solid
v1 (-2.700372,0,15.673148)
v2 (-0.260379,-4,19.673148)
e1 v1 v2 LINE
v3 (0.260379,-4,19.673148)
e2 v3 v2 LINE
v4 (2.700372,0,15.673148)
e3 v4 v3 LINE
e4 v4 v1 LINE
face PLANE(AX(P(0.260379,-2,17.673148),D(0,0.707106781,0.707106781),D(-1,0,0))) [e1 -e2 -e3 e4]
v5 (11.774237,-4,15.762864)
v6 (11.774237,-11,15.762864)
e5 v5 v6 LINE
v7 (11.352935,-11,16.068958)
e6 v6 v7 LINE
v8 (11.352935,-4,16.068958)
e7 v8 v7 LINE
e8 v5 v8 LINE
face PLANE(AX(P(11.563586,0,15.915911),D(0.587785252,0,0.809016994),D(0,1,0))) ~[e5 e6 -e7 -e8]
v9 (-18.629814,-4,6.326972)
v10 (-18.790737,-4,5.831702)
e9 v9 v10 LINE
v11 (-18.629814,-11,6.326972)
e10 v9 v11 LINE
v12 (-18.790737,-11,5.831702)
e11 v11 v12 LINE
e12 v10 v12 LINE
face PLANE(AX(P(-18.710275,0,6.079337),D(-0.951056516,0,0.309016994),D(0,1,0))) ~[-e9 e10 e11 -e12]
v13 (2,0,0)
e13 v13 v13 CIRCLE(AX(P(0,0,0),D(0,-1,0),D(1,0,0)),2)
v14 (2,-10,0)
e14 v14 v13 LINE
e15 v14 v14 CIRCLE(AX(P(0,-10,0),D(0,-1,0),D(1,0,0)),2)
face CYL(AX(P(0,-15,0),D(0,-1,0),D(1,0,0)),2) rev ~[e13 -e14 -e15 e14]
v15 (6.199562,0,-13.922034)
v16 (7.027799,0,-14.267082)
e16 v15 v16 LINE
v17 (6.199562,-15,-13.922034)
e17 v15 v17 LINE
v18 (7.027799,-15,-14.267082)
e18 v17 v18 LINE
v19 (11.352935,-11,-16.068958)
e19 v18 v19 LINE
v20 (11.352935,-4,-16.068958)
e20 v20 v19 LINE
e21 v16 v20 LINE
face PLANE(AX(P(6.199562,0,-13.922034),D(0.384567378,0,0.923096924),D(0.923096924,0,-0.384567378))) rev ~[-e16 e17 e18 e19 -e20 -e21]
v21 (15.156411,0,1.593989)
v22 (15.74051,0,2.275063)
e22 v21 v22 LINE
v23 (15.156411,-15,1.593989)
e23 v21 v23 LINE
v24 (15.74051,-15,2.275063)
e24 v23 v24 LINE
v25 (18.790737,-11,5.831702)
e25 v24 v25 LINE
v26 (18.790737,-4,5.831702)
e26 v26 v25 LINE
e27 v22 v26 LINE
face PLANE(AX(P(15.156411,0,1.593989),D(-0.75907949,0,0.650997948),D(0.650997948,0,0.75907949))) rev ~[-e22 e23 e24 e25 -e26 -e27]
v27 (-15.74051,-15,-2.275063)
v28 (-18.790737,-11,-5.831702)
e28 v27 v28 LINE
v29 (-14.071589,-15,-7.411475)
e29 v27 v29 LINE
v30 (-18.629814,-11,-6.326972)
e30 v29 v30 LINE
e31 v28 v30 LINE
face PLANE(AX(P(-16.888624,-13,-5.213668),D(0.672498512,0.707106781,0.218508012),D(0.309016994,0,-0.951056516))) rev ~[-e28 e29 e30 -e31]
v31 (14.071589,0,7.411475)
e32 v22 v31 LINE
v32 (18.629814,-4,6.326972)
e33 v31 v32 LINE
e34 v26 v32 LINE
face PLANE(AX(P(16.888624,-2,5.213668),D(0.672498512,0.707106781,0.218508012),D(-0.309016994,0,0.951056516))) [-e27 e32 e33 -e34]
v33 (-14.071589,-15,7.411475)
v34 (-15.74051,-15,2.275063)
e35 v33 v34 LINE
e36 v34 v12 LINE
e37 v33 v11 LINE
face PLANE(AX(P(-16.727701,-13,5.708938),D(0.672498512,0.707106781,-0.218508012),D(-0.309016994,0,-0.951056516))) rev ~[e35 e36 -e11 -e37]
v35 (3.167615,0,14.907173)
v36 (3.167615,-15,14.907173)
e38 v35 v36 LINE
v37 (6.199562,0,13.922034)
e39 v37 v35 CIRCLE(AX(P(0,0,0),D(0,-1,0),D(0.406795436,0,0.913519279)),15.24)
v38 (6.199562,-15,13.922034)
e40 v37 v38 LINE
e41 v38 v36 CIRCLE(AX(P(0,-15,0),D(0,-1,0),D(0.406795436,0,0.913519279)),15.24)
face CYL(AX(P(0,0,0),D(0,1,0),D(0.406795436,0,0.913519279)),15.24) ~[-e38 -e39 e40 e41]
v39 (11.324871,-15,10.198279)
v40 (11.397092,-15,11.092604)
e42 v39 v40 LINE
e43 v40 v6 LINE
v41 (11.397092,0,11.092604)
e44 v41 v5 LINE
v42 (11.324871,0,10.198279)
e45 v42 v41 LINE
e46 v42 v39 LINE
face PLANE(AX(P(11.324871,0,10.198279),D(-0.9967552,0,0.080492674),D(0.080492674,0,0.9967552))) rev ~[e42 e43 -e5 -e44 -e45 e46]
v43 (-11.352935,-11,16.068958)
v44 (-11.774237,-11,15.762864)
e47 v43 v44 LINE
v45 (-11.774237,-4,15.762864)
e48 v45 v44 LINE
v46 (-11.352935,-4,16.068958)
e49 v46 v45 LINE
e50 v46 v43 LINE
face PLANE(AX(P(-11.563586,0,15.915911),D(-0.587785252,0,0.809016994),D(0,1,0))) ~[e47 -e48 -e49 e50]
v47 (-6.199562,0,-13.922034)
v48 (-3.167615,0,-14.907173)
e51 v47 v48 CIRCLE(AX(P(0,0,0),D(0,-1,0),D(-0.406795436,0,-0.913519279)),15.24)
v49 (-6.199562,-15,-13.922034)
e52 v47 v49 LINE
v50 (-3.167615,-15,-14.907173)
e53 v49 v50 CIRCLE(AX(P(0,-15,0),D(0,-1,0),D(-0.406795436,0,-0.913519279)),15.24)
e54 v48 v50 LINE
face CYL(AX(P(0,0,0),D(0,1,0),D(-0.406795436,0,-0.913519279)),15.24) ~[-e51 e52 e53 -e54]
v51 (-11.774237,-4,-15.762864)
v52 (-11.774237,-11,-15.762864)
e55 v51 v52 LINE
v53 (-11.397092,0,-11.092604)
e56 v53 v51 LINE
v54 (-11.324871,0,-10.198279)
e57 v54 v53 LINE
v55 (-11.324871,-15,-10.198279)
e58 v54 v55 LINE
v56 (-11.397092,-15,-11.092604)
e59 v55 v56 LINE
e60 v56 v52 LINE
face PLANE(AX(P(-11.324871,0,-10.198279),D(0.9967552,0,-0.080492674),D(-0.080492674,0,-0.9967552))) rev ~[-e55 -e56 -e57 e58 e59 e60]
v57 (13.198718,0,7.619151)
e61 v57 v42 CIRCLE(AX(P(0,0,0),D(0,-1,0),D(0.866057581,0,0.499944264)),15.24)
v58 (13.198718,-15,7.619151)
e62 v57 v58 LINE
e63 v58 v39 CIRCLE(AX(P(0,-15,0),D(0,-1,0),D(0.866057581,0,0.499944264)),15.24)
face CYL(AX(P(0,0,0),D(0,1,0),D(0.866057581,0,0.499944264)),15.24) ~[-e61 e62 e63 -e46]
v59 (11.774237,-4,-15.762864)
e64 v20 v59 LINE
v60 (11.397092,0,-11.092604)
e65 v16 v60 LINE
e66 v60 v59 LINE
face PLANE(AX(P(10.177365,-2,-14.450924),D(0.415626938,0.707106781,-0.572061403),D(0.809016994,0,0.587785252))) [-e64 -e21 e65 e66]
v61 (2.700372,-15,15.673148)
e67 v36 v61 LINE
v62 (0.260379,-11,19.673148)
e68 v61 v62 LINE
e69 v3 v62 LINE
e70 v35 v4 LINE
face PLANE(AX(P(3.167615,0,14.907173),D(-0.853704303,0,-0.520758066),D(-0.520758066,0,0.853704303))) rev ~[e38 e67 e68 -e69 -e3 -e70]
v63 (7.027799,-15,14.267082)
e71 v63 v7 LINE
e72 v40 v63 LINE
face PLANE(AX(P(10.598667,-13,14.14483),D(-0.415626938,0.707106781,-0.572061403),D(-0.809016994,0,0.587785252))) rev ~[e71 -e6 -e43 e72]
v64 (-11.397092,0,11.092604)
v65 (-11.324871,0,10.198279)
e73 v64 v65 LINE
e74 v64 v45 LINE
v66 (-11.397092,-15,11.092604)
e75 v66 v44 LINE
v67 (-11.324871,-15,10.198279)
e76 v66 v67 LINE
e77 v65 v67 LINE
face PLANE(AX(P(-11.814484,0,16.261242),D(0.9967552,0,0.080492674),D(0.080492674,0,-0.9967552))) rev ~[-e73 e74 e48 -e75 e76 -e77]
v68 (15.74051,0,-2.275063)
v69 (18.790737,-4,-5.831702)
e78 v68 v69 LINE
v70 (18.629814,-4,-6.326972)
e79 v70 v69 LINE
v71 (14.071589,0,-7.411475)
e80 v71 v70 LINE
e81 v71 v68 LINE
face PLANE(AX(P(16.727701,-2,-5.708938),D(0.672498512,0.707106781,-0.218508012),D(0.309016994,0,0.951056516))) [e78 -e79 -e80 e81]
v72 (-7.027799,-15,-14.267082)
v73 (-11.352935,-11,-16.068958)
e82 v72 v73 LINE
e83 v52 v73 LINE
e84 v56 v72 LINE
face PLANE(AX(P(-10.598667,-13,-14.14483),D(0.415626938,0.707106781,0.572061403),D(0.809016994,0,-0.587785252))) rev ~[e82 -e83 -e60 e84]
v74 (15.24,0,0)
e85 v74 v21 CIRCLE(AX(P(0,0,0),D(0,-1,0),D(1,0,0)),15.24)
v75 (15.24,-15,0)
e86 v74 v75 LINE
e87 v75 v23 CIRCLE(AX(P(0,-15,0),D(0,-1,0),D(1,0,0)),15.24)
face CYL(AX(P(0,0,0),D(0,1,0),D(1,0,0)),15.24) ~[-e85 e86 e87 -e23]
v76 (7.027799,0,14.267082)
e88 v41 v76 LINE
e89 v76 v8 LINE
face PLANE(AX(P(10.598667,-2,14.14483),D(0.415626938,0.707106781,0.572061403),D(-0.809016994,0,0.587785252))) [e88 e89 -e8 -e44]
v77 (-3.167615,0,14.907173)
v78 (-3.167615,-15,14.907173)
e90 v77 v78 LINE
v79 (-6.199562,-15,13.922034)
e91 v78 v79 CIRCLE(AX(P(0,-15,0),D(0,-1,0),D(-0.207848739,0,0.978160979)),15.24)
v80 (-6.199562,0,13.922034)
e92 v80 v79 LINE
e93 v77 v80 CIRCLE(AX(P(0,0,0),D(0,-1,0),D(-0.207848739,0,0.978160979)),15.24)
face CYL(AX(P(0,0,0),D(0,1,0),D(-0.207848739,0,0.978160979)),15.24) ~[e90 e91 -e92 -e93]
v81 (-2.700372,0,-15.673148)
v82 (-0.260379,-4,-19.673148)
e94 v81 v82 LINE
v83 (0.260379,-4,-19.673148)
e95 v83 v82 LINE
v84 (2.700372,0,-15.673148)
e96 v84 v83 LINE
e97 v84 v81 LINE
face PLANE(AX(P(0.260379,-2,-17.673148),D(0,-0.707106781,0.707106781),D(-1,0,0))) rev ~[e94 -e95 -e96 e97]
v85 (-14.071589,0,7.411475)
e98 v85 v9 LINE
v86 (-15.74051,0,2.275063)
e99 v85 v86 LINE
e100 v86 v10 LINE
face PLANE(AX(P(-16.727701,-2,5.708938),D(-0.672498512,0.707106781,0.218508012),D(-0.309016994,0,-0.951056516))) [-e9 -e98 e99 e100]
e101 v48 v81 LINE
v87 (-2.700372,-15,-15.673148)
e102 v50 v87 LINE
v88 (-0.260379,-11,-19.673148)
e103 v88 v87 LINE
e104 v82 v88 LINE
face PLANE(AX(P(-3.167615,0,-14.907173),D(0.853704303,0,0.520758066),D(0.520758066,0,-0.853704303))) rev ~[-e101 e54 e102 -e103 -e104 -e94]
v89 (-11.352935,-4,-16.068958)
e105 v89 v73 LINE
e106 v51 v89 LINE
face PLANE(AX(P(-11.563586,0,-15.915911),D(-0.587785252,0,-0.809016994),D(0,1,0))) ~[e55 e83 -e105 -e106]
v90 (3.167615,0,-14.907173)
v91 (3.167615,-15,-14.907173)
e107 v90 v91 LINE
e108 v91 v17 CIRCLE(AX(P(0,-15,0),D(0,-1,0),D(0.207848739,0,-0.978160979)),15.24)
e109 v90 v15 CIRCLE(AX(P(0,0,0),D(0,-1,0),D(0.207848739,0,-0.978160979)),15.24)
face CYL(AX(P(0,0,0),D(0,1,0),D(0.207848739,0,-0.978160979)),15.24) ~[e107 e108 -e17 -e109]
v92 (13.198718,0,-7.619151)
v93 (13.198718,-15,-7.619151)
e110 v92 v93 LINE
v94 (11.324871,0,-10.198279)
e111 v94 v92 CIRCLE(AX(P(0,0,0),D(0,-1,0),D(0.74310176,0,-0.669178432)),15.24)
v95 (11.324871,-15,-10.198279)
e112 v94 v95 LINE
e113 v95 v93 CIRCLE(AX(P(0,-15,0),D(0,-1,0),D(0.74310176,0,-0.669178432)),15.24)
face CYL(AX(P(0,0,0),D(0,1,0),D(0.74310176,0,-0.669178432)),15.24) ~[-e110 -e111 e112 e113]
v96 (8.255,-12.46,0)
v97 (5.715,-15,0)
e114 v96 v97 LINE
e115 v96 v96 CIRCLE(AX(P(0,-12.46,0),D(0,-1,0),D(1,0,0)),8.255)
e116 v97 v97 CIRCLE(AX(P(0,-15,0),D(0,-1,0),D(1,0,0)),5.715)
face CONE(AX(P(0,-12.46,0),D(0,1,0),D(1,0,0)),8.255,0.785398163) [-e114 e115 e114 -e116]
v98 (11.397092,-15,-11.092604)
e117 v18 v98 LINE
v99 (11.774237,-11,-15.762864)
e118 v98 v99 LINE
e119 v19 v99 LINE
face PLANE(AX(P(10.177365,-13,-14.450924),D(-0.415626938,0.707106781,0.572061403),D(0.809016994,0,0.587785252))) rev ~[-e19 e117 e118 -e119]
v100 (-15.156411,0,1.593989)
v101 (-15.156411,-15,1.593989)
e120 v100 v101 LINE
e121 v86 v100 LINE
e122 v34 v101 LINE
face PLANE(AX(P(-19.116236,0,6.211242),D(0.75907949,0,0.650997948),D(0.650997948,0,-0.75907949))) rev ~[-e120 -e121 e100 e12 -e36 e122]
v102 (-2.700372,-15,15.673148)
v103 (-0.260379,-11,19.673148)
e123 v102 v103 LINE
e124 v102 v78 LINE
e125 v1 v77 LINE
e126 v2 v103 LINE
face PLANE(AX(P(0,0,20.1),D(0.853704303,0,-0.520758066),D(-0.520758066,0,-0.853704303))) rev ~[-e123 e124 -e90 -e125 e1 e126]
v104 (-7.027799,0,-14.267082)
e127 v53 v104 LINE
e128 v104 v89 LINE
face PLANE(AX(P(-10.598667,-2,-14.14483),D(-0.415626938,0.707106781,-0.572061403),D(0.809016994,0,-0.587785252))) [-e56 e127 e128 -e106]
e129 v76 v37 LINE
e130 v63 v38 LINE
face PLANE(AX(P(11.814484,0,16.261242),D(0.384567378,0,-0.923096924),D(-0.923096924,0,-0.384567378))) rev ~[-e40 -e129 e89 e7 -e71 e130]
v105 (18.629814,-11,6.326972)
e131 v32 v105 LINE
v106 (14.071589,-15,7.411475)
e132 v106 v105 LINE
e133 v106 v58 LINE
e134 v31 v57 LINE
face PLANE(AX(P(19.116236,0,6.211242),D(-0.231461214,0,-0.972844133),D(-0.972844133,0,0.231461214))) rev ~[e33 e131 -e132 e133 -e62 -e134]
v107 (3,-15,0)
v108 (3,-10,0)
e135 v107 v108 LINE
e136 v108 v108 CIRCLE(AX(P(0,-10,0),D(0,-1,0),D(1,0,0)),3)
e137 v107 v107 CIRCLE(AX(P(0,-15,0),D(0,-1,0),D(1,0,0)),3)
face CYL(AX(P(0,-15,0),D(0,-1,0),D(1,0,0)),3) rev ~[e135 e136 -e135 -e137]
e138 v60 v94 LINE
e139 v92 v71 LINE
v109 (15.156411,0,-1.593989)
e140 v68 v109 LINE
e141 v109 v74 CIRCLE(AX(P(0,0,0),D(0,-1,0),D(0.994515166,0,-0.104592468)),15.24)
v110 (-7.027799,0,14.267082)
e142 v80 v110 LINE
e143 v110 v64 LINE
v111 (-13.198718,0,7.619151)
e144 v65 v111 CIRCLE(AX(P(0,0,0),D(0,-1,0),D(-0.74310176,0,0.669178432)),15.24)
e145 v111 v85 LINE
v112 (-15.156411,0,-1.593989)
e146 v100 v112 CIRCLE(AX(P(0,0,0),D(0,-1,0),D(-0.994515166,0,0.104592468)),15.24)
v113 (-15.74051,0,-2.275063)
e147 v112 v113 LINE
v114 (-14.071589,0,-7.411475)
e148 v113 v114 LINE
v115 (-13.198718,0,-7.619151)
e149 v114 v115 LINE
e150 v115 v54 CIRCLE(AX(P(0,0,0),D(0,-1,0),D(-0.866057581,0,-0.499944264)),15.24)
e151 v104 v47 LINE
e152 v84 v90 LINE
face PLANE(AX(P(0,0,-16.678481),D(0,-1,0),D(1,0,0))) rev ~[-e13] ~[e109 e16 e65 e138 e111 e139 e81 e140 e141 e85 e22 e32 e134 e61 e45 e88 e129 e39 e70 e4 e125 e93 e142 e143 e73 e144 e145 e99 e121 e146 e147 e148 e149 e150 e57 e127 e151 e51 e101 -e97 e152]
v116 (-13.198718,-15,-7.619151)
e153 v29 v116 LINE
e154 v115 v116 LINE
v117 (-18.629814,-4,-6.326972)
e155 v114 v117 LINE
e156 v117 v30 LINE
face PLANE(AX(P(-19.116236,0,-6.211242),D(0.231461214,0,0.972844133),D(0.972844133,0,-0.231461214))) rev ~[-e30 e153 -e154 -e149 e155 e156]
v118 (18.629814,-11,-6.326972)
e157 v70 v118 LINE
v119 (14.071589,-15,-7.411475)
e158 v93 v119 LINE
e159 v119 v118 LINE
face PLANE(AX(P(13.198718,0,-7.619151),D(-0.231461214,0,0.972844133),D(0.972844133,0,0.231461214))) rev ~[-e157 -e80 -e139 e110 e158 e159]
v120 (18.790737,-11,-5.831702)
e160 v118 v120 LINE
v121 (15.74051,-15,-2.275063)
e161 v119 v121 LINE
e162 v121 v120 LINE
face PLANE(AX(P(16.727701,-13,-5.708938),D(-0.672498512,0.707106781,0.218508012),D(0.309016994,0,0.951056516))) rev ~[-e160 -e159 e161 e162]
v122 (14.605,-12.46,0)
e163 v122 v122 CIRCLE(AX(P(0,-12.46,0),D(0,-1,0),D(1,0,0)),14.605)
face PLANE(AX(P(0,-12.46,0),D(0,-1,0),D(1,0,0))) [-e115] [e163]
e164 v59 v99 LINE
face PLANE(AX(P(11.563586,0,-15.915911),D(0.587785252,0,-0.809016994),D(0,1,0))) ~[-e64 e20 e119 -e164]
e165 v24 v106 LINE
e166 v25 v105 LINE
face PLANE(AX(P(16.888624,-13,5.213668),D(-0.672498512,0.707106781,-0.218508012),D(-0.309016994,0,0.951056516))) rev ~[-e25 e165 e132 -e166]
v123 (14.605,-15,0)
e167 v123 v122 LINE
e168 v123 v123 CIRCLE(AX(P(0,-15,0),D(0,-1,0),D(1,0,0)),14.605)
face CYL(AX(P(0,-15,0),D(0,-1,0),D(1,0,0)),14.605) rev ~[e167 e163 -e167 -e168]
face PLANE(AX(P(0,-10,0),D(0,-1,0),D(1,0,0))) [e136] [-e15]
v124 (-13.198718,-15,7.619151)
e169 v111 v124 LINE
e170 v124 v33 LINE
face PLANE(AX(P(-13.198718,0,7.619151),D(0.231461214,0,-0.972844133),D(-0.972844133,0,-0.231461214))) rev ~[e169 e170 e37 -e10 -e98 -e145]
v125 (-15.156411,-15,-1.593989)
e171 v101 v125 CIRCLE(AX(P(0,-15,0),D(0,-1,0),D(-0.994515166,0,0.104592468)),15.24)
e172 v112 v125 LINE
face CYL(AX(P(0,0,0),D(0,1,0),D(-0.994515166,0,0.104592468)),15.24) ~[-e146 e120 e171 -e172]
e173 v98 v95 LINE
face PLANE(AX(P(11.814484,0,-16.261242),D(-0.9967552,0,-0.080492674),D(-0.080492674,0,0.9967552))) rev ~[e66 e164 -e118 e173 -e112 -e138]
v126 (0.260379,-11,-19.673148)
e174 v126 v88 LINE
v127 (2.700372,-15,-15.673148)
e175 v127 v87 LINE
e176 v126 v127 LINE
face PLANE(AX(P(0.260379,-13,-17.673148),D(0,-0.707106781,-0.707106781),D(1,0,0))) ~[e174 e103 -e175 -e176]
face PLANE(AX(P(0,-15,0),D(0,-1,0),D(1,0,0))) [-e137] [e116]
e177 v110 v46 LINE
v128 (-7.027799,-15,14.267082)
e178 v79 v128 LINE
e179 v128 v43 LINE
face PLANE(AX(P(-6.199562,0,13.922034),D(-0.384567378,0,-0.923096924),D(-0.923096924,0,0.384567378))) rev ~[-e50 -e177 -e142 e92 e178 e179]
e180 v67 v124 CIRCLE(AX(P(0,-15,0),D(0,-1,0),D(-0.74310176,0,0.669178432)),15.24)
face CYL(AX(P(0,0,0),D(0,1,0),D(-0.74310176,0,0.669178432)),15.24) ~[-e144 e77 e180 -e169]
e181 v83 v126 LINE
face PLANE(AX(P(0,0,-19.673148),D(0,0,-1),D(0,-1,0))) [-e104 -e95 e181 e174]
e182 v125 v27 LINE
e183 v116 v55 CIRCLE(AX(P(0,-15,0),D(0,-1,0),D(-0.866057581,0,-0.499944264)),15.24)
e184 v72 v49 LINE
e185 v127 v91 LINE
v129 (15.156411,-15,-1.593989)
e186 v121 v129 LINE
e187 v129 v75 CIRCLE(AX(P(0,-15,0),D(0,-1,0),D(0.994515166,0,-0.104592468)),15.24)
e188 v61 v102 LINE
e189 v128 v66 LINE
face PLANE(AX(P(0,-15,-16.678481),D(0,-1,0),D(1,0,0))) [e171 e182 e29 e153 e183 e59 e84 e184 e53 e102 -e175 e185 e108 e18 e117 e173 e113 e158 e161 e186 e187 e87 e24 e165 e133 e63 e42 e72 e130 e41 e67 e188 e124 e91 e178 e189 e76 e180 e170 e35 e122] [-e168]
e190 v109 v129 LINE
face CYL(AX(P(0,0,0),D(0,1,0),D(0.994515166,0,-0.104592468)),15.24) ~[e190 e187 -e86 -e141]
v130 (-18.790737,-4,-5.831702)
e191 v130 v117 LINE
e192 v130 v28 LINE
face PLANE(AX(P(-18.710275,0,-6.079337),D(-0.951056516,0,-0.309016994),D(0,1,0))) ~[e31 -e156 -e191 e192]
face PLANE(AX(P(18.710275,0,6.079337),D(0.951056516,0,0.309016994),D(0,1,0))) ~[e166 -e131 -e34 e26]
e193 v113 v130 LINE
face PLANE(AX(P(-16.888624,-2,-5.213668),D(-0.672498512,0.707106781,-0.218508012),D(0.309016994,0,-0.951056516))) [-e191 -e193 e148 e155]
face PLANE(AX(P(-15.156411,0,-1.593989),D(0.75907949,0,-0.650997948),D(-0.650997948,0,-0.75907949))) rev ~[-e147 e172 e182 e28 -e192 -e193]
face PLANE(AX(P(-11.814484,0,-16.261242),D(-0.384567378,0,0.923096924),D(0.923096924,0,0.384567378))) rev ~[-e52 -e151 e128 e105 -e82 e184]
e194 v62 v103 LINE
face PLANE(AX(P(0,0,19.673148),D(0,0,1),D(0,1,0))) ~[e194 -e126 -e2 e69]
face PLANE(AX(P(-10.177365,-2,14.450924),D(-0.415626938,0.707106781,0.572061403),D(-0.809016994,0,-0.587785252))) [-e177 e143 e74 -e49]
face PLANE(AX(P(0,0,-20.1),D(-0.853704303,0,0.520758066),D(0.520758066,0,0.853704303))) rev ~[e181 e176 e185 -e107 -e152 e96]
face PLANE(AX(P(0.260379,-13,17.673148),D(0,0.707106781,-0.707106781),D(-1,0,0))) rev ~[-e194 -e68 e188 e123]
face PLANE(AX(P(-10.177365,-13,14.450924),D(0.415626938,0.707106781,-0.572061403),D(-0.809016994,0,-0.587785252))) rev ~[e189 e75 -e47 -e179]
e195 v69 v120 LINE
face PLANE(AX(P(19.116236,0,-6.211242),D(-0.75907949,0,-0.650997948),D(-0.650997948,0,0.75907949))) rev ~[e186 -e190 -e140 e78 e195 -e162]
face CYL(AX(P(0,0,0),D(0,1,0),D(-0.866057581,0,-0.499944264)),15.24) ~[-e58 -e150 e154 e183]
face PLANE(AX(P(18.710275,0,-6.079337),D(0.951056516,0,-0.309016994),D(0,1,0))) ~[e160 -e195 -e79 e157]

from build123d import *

# Parameters (mm, degrees)
F1_DEPTH = 15
F2_SIZE  = 0.5
F3_SIZE  = 4
F4_R     = 2
F5_DEPTH = 25.4
F6_R     = 3
F7_DEPTH = 5
F8_R     = 14.605
F8_R_2   = 3.175
F9_DEPTH = 2.54


# Not quite as in the source:
# - a fillet or chamfer that OpenCascade refuses, or shapes differently, is made with other operations: its cross-section is extruded or revolved along the edge and cut away or added


with BuildPart() as f1:
    # F0 (on Front) → F1 (new body)
    with BuildSketch(Plane.XZ):
        with BuildLine():
            Line((0, -20.1), (3.1676147888, -14.9071733253))
            ThreePointArc((3.1676147888, -14.9071733253), (0, -15.24), (-3.1676147888, -14.9071733253))
            Line((-3.1676147888, -14.9071733253), (0, -20.1))
        make_face()
        with BuildLine():
            ThreePointArc((-3.1676147888, 14.9071733253), (0, 15.24), (3.1676147888, 14.9071733253))
            Line((3.1676147888, 14.9071733253), (0, 20.1))
            Line((0, 20.1), (-3.1676147888, 14.9071733253))
        make_face()
        with BuildLine():
            ThreePointArc((-11.3248708297, 10.1982793004), (-8.9578472449, 12.3294189943), (-6.1995624382, 13.922033816))
            Line((-6.1995624382, 13.922033816), (-11.8144835711, 16.2612415869))
            Line((-11.8144835711, 16.2612415869), (-11.3248708297, 10.1982793004))
        make_face()
        with BuildLine():
            ThreePointArc((-15.1564111319, 1.5939892096), (-14.4941013083, 4.7094189943), (-13.1987175292, 7.6191505816))
            Line((-13.1987175292, 7.6191505816), (-19.1162359775, 6.2112415869))
            Line((-19.1162359775, 6.2112415869), (-15.1564111319, 1.5939892096))
        make_face()
        with BuildLine():
            Line((-19.1162359775, -6.2112415869), (-13.1987175292, -7.6191505816))
            ThreePointArc((-13.1987175292, -7.6191505816), (-14.4941013083, -4.7094189943), (-15.1564111319, -1.5939892096))
            Line((-15.1564111319, -1.5939892096), (-19.1162359775, -6.2112415869))
        make_face()
        with BuildLine():
            Line((-11.8144835711, -16.2612415869), (-6.1995624382, -13.922033816))
            ThreePointArc((-6.1995624382, -13.922033816), (-8.9578472449, -12.3294189943), (-11.3248708297, -10.1982793004))
            Line((-11.3248708297, -10.1982793004), (-11.8144835711, -16.2612415869))
        make_face()
        with BuildLine():
            ThreePointArc((15.1564111319, -1.5939892096), (15.2190884361, -0.7980897035), (15.24, 0))
            ThreePointArc((15.24, 0), (15.2190884361, 0.7980897035), (15.1564111319, 1.5939892096))
            ThreePointArc((15.1564111319, 1.5939892096), (14.4941013083, 4.7094189943), (13.1987175292, 7.6191505816))
            ThreePointArc((13.1987175292, 7.6191505816), (12.3294189943, 8.9578472449), (11.3248708297, 10.1982793004))
            ThreePointArc((11.3248708297, 10.1982793004), (8.9578472449, 12.3294189943), (6.1995624382, 13.922033816))
            ThreePointArc((6.1995624382, 13.922033816), (4.7094189943, 14.4941013083), (3.1676147888, 14.9071733253))
            ThreePointArc((3.1676147888, 14.9071733253), (0, 15.24), (-3.1676147888, 14.9071733253))
            ThreePointArc((-3.1676147888, 14.9071733253), (-4.7094189943, 14.4941013083), (-6.1995624382, 13.922033816))
            ThreePointArc((-6.1995624382, 13.922033816), (-8.9578472449, 12.3294189943), (-11.3248708297, 10.1982793004))
            ThreePointArc((-11.3248708297, 10.1982793004), (-12.3294189943, 8.9578472449), (-13.1987175292, 7.6191505816))
            ThreePointArc((-13.1987175292, 7.6191505816), (-14.4941013083, 4.7094189943), (-15.1564111319, 1.5939892096))
            ThreePointArc((-15.1564111319, 1.5939892096), (-15.24, 0), (-15.1564111319, -1.5939892096))
            ThreePointArc((-15.1564111319, -1.5939892096), (-14.4941013083, -4.7094189943), (-13.1987175292, -7.6191505816))
            ThreePointArc((-13.1987175292, -7.6191505816), (-12.3294189943, -8.9578472449), (-11.3248708297, -10.1982793004))
            ThreePointArc((-11.3248708297, -10.1982793004), (-8.9578472449, -12.3294189943), (-6.1995624382, -13.922033816))
            ThreePointArc((-6.1995624382, -13.922033816), (-4.7094189943, -14.4941013083), (-3.1676147888, -14.9071733253))
            ThreePointArc((-3.1676147888, -14.9071733253), (0, -15.24), (3.1676147888, -14.9071733253))
            ThreePointArc((3.1676147888, -14.9071733253), (4.7094189943, -14.4941013083), (6.1995624382, -13.922033816))
            ThreePointArc((6.1995624382, -13.922033816), (8.9578472449, -12.3294189943), (11.3248708297, -10.1982793004))
            ThreePointArc((11.3248708297, -10.1982793004), (12.3294189943, -8.9578472449), (13.1987175292, -7.6191505816))
            ThreePointArc((13.1987175292, -7.6191505816), (14.4941013083, -4.7094189943), (15.1564111319, -1.5939892096))
        make_face()
        with BuildLine():
            ThreePointArc((6.1995624382, 13.922033816), (8.9578472449, 12.3294189943), (11.3248708297, 10.1982793004))
            Line((11.3248708297, 10.1982793004), (11.8144835711, 16.2612415869))
            Line((11.8144835711, 16.2612415869), (6.1995624382, 13.922033816))
        make_face()
        with BuildLine():
            ThreePointArc((13.1987175292, 7.6191505816), (14.4941013083, 4.7094189943), (15.1564111319, 1.5939892096))
            Line((15.1564111319, 1.5939892096), (19.1162359775, 6.2112415869))
            Line((19.1162359775, 6.2112415869), (13.1987175292, 7.6191505816))
        make_face()
        with BuildLine():
            Line((19.1162359775, -6.2112415869), (15.1564111319, -1.5939892096))
            ThreePointArc((15.1564111319, -1.5939892096), (14.4941013083, -4.7094189943), (13.1987175292, -7.6191505816))
            Line((13.1987175292, -7.6191505816), (19.1162359775, -6.2112415869))
        make_face()
        with BuildLine():
            Line((11.8144835711, -16.2612415869), (11.3248708297, -10.1982793004))
            ThreePointArc((11.3248708297, -10.1982793004), (8.9578472449, -12.3294189943), (6.1995624382, -13.922033816))
            Line((6.1995624382, -13.922033816), (11.8144835711, -16.2612415869))
        make_face()
    extrude(amount=F1_DEPTH)

    # F2
    f2_edges = [f1.edges().sort_by_distance(p)[0] for p in [
        (0, -7.5, -20.1),
        (0, -7.5, 20.1),
        (-11.814484, -7.5, -16.261242),
        (-19.116236, -7.5, -6.211242),
        (-19.116236, -7.5, 6.211242),
        (-11.814484, -7.5, 16.261242),
        (11.814484, -7.5, 16.261242),
        (19.116236, -7.5, 6.211242),
        (19.116236, -7.5, -6.211242),
        (11.814484, -7.5, -16.261242),
    ]]
    chamfer(f2_edges, length=F2_SIZE)

    # F3
    f3_edges = [f1.edges().sort_by_distance(p)[0] for p in [
        (-11.563586, -15, 15.915911),
        (-11.563586, 0, 15.915911),
        (0, 0, 19.673148),
        (0, -15, 19.673148),
        (0, -15, -19.673148),
        (-11.563586, -15, -15.915911),
        (-18.710275, -15, -6.079337),
        (-18.710275, -15, 6.079337),
        (-18.710275, 0, 6.079337),
        (-18.710275, 0, -6.079337),
        (-11.563586, 0, -15.915911),
        (0, 0, -19.673148),
        (11.563586, -15, 15.915911),
        (18.710275, -15, 6.079337),
        (18.710275, -15, -6.079337),
        (11.563586, -15, -15.915911),
        (11.563586, 0, 15.915911),
        (18.710275, 0, 6.079337),
        (18.710275, 0, -6.079337),
        (11.563586, 0, -15.915911),
    ]]
    chamfer(f3_edges, length=F3_SIZE)

    # F4 (on face) → F5 (cut)
    with BuildSketch(Plane.XZ.offset(15)):
        Circle(F4_R)
    extrude(amount=-F5_DEPTH, mode=Mode.SUBTRACT)

    # F6 (on face) → F7 (cut)
    with BuildSketch(Plane.XZ.offset(15)):
        Circle(F6_R)
    extrude(amount=-F7_DEPTH, mode=Mode.SUBTRACT)

    # F8 (on face) → F9 (cut)
    with BuildSketch(Plane.XZ.offset(15)):
        Circle(F8_R)
        Circle(F8_R_2, mode=Mode.SUBTRACT)
    extrude(amount=-F9_DEPTH, mode=Mode.SUBTRACT)

    # F10: chamfer of 5.08 on 1 edges, made by hand


with BuildPart() as f10_tool2:
    # F10_s3 → F10_t4 (revolve)
    with BuildSketch(Plane.XY):
        Polygon((8.255, -12.46), (3.175, -17.54), (3.175, -12.46), align=None)
    revolve(axis=Axis((0, -12.46, 0), (0, -1, 0)))

    split(bisect_by=Plane.XZ.offset(15), keep=Keep.BOTTOM)


with BuildPart() as f1_1:
    add(f1.part)

    # F10_t1: union F10_tool2
    add(f10_tool2.part)


solid = f1_1.part
